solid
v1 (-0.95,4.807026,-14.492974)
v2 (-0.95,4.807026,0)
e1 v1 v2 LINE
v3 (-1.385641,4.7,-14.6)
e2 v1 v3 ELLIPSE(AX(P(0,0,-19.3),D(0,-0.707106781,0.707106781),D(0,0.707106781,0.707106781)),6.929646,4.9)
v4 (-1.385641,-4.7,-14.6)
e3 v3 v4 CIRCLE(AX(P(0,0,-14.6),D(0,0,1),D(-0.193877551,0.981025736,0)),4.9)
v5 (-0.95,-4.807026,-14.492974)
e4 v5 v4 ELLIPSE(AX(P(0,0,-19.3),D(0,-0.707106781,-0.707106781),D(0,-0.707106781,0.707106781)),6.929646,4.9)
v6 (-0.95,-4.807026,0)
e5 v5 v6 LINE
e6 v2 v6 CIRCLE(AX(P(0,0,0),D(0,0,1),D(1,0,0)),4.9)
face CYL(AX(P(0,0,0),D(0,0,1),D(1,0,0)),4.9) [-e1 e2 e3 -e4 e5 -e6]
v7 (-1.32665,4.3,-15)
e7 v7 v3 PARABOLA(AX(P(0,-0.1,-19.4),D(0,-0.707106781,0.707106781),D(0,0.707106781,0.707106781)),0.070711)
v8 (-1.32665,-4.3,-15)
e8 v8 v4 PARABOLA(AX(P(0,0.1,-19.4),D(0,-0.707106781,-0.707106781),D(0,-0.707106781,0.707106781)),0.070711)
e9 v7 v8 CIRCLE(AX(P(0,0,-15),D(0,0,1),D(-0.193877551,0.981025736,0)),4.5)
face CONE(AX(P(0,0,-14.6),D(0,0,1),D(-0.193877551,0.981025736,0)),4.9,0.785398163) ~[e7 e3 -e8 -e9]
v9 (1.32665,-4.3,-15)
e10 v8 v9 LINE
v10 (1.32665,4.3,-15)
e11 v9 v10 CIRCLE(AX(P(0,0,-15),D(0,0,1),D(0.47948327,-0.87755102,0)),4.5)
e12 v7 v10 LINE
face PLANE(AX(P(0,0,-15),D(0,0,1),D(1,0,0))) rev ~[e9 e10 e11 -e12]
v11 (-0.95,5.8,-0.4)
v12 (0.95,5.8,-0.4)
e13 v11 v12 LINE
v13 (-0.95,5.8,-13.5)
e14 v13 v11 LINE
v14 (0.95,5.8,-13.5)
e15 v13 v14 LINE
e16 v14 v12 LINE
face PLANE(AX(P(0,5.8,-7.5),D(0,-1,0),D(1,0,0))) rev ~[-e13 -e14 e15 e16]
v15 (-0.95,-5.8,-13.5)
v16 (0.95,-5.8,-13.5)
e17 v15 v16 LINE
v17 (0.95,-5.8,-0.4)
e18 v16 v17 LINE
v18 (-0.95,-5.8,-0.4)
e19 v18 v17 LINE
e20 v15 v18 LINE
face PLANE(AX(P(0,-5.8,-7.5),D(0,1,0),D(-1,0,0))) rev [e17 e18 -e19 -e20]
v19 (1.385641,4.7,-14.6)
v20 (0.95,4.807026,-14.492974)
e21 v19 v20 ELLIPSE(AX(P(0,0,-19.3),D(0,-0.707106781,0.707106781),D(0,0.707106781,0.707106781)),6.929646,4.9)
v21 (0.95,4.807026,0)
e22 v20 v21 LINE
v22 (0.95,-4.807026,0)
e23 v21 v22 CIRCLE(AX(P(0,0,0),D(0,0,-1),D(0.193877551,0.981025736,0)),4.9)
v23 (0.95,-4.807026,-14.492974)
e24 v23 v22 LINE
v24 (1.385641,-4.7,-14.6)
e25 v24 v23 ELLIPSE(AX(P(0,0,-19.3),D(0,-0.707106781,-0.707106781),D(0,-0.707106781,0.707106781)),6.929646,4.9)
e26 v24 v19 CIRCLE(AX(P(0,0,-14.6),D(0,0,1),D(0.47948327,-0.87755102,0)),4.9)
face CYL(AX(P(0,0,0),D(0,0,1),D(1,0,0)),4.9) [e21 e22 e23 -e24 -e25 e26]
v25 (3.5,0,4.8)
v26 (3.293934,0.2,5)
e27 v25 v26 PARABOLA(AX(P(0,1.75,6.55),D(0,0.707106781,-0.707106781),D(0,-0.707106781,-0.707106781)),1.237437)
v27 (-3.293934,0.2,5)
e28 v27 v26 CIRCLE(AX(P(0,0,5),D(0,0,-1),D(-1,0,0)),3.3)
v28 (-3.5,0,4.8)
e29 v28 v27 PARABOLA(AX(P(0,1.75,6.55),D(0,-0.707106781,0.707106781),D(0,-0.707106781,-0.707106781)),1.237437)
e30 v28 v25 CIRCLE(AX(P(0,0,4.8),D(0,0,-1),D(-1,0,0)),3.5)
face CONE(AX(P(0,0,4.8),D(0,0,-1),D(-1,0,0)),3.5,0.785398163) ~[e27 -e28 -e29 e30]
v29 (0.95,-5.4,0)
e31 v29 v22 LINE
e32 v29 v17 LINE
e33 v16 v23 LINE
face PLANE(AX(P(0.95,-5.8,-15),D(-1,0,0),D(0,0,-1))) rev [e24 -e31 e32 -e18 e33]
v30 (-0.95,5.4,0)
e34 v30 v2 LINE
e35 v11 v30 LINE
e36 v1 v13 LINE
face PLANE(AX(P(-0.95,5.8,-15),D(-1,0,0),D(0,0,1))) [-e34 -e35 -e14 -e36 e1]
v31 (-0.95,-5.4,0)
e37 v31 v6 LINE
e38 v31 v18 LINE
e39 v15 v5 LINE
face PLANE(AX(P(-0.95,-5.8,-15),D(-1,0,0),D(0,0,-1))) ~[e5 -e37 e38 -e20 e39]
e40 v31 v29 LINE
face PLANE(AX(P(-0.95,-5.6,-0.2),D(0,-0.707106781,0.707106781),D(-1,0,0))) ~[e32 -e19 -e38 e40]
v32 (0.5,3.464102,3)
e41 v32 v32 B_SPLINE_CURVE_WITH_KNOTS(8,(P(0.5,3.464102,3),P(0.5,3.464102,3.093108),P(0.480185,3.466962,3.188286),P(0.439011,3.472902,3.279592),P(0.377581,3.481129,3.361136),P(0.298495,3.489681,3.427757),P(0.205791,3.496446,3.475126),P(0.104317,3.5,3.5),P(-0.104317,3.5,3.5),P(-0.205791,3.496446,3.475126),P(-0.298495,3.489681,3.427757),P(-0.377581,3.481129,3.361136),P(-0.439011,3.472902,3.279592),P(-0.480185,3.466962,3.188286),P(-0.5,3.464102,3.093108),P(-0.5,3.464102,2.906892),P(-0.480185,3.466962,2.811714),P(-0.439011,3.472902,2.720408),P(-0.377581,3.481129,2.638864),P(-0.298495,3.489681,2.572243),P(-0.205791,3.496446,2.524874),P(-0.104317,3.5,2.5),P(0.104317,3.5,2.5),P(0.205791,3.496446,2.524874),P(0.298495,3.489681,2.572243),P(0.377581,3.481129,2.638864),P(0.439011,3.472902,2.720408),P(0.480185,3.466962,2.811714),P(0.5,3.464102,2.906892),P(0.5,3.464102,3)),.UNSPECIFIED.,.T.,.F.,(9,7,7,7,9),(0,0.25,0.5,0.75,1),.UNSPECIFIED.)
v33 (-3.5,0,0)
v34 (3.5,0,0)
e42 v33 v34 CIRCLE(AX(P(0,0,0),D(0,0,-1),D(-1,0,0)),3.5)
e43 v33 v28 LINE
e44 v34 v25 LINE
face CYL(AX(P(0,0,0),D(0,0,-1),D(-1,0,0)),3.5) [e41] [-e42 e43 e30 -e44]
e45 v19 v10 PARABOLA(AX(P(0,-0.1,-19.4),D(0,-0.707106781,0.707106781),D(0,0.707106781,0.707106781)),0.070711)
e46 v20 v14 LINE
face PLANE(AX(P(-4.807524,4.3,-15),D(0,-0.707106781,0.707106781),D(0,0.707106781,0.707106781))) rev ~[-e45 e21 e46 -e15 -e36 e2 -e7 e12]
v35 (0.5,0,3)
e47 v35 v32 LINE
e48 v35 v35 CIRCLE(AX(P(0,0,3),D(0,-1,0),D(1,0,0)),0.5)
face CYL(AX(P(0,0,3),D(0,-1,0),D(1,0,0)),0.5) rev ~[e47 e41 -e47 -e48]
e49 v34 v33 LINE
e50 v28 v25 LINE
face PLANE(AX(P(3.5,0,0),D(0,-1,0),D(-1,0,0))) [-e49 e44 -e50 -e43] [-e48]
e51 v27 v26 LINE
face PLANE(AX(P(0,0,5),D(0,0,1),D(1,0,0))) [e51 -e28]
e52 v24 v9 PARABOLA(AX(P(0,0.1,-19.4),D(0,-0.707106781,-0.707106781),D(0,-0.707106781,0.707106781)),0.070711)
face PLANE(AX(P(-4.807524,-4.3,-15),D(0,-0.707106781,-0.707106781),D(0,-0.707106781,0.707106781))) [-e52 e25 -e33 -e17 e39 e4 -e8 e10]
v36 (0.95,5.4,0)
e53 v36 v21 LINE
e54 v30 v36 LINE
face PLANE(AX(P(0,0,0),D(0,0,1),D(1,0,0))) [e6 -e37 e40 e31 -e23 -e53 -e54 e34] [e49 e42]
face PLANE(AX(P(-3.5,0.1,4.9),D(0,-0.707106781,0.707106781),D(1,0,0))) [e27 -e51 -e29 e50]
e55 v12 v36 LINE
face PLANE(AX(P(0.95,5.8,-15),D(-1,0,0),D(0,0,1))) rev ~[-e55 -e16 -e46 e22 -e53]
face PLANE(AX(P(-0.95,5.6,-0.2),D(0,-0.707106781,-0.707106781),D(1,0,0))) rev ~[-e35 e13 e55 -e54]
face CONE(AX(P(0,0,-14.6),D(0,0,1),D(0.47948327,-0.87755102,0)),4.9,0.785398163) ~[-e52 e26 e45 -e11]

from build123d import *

# Parameters (mm, degrees)
F1_R          = 4.9
F2_DEPTH      = 5
F2_DEPTH_BACK = 15
F5_W          = 1.9
F5_H          = 15
F3_R          = 4.9
F7_DEPTH      = 5.001
F8_R          = 0.5
F9_DEPTH      = 5.801
F10_SIZE      = 0.2
F11_SIZE      = 0.4
F12_T1_DEPTH  = 9.6150489639
F13_SIZE      = 0.4


# Not quite as in the source:
# - a fillet or chamfer that OpenCascade refuses, or shapes differently, is made with other operations: its cross-section is extruded or revolved along the edge and cut away or added
# - a pattern or mirror of a feature is missing from the dataset's text; its kind, count and spacing are read off the source's solid


with BuildPart() as f2:
    # F1 (on Top) → F2 (new body, two sides)
    with BuildSketch(Plane.XY) as f2_sk:
        Circle(F1_R)
    extrude(amount=F2_DEPTH)
    extrude(f2_sk.sketch, amount=-F2_DEPTH_BACK)

    # F5 (on offset) → F6 (join, up to the next surface of F2)
    with BuildSketch(Plane.XZ.offset(-5.8)):
        with Locations((0, -7.5)):
            Rectangle(F5_W, F5_H)
    f6 = extrude(until=Until.NEXT)

    # F6_copies: F6 across plane
    add(f6.mirror(Plane(origin=(0, 0, 0), x_dir=(0, 0, -1), z_dir=(0, -1, 0))))

    # F3 (on Top) → F7 (cut, through all)
    with BuildSketch(Plane.XY):
        Circle(F3_R)
        with BuildLine():
            ThreePointArc((-3.5, 0), (0, 3.5), (3.5, 0))
            Line((3.5, 0), (-3.5, 0))
        make_face(mode=Mode.SUBTRACT)
    extrude(amount=F7_DEPTH, mode=Mode.SUBTRACT)

    # F8 (on face) → F9 (cut, through all)
    with BuildSketch(Plane.XZ):
        with Locations((0, 3)):
            Circle(F8_R)
    extrude(amount=-F9_DEPTH, mode=Mode.SUBTRACT)

    # F10
    f10_edges = [f2.edges().sort_by_distance(p)[0] for p in [
        (0, 3.5, 5),
        (0, 0, 5),
    ]]
    chamfer(f10_edges, length=F10_SIZE)

    # F11
    f11_edges = [f2.edges().sort_by_distance(p)[0] for p in [
        (-4.9, 0, -15),
    ]]
    chamfer(f11_edges, length=F11_SIZE)

    # F12: chamfer of 1.5 on 2 edges, made by hand

    # F12_s2 → F12_t1 (cut)
    with BuildSketch(Plane.YZ.offset(-4.8075244819)):
        Polygon((4.3, -15), (5.8, -13.5), (5.8, -15), align=None)
        Polygon((-4.3, -15), (-5.8, -13.5), (-5.8, -15), align=None)
    extrude(amount=F12_T1_DEPTH, mode=Mode.SUBTRACT)

    # F13
    f13_edges = [f2.edges().sort_by_distance(p)[0] for p in [
        (0, 5.8, 0),
        (0, -5.8, 0),
        (4.9, 0, -15),
    ]]
    chamfer(f13_edges, length=F13_SIZE)


solid = f2.part
